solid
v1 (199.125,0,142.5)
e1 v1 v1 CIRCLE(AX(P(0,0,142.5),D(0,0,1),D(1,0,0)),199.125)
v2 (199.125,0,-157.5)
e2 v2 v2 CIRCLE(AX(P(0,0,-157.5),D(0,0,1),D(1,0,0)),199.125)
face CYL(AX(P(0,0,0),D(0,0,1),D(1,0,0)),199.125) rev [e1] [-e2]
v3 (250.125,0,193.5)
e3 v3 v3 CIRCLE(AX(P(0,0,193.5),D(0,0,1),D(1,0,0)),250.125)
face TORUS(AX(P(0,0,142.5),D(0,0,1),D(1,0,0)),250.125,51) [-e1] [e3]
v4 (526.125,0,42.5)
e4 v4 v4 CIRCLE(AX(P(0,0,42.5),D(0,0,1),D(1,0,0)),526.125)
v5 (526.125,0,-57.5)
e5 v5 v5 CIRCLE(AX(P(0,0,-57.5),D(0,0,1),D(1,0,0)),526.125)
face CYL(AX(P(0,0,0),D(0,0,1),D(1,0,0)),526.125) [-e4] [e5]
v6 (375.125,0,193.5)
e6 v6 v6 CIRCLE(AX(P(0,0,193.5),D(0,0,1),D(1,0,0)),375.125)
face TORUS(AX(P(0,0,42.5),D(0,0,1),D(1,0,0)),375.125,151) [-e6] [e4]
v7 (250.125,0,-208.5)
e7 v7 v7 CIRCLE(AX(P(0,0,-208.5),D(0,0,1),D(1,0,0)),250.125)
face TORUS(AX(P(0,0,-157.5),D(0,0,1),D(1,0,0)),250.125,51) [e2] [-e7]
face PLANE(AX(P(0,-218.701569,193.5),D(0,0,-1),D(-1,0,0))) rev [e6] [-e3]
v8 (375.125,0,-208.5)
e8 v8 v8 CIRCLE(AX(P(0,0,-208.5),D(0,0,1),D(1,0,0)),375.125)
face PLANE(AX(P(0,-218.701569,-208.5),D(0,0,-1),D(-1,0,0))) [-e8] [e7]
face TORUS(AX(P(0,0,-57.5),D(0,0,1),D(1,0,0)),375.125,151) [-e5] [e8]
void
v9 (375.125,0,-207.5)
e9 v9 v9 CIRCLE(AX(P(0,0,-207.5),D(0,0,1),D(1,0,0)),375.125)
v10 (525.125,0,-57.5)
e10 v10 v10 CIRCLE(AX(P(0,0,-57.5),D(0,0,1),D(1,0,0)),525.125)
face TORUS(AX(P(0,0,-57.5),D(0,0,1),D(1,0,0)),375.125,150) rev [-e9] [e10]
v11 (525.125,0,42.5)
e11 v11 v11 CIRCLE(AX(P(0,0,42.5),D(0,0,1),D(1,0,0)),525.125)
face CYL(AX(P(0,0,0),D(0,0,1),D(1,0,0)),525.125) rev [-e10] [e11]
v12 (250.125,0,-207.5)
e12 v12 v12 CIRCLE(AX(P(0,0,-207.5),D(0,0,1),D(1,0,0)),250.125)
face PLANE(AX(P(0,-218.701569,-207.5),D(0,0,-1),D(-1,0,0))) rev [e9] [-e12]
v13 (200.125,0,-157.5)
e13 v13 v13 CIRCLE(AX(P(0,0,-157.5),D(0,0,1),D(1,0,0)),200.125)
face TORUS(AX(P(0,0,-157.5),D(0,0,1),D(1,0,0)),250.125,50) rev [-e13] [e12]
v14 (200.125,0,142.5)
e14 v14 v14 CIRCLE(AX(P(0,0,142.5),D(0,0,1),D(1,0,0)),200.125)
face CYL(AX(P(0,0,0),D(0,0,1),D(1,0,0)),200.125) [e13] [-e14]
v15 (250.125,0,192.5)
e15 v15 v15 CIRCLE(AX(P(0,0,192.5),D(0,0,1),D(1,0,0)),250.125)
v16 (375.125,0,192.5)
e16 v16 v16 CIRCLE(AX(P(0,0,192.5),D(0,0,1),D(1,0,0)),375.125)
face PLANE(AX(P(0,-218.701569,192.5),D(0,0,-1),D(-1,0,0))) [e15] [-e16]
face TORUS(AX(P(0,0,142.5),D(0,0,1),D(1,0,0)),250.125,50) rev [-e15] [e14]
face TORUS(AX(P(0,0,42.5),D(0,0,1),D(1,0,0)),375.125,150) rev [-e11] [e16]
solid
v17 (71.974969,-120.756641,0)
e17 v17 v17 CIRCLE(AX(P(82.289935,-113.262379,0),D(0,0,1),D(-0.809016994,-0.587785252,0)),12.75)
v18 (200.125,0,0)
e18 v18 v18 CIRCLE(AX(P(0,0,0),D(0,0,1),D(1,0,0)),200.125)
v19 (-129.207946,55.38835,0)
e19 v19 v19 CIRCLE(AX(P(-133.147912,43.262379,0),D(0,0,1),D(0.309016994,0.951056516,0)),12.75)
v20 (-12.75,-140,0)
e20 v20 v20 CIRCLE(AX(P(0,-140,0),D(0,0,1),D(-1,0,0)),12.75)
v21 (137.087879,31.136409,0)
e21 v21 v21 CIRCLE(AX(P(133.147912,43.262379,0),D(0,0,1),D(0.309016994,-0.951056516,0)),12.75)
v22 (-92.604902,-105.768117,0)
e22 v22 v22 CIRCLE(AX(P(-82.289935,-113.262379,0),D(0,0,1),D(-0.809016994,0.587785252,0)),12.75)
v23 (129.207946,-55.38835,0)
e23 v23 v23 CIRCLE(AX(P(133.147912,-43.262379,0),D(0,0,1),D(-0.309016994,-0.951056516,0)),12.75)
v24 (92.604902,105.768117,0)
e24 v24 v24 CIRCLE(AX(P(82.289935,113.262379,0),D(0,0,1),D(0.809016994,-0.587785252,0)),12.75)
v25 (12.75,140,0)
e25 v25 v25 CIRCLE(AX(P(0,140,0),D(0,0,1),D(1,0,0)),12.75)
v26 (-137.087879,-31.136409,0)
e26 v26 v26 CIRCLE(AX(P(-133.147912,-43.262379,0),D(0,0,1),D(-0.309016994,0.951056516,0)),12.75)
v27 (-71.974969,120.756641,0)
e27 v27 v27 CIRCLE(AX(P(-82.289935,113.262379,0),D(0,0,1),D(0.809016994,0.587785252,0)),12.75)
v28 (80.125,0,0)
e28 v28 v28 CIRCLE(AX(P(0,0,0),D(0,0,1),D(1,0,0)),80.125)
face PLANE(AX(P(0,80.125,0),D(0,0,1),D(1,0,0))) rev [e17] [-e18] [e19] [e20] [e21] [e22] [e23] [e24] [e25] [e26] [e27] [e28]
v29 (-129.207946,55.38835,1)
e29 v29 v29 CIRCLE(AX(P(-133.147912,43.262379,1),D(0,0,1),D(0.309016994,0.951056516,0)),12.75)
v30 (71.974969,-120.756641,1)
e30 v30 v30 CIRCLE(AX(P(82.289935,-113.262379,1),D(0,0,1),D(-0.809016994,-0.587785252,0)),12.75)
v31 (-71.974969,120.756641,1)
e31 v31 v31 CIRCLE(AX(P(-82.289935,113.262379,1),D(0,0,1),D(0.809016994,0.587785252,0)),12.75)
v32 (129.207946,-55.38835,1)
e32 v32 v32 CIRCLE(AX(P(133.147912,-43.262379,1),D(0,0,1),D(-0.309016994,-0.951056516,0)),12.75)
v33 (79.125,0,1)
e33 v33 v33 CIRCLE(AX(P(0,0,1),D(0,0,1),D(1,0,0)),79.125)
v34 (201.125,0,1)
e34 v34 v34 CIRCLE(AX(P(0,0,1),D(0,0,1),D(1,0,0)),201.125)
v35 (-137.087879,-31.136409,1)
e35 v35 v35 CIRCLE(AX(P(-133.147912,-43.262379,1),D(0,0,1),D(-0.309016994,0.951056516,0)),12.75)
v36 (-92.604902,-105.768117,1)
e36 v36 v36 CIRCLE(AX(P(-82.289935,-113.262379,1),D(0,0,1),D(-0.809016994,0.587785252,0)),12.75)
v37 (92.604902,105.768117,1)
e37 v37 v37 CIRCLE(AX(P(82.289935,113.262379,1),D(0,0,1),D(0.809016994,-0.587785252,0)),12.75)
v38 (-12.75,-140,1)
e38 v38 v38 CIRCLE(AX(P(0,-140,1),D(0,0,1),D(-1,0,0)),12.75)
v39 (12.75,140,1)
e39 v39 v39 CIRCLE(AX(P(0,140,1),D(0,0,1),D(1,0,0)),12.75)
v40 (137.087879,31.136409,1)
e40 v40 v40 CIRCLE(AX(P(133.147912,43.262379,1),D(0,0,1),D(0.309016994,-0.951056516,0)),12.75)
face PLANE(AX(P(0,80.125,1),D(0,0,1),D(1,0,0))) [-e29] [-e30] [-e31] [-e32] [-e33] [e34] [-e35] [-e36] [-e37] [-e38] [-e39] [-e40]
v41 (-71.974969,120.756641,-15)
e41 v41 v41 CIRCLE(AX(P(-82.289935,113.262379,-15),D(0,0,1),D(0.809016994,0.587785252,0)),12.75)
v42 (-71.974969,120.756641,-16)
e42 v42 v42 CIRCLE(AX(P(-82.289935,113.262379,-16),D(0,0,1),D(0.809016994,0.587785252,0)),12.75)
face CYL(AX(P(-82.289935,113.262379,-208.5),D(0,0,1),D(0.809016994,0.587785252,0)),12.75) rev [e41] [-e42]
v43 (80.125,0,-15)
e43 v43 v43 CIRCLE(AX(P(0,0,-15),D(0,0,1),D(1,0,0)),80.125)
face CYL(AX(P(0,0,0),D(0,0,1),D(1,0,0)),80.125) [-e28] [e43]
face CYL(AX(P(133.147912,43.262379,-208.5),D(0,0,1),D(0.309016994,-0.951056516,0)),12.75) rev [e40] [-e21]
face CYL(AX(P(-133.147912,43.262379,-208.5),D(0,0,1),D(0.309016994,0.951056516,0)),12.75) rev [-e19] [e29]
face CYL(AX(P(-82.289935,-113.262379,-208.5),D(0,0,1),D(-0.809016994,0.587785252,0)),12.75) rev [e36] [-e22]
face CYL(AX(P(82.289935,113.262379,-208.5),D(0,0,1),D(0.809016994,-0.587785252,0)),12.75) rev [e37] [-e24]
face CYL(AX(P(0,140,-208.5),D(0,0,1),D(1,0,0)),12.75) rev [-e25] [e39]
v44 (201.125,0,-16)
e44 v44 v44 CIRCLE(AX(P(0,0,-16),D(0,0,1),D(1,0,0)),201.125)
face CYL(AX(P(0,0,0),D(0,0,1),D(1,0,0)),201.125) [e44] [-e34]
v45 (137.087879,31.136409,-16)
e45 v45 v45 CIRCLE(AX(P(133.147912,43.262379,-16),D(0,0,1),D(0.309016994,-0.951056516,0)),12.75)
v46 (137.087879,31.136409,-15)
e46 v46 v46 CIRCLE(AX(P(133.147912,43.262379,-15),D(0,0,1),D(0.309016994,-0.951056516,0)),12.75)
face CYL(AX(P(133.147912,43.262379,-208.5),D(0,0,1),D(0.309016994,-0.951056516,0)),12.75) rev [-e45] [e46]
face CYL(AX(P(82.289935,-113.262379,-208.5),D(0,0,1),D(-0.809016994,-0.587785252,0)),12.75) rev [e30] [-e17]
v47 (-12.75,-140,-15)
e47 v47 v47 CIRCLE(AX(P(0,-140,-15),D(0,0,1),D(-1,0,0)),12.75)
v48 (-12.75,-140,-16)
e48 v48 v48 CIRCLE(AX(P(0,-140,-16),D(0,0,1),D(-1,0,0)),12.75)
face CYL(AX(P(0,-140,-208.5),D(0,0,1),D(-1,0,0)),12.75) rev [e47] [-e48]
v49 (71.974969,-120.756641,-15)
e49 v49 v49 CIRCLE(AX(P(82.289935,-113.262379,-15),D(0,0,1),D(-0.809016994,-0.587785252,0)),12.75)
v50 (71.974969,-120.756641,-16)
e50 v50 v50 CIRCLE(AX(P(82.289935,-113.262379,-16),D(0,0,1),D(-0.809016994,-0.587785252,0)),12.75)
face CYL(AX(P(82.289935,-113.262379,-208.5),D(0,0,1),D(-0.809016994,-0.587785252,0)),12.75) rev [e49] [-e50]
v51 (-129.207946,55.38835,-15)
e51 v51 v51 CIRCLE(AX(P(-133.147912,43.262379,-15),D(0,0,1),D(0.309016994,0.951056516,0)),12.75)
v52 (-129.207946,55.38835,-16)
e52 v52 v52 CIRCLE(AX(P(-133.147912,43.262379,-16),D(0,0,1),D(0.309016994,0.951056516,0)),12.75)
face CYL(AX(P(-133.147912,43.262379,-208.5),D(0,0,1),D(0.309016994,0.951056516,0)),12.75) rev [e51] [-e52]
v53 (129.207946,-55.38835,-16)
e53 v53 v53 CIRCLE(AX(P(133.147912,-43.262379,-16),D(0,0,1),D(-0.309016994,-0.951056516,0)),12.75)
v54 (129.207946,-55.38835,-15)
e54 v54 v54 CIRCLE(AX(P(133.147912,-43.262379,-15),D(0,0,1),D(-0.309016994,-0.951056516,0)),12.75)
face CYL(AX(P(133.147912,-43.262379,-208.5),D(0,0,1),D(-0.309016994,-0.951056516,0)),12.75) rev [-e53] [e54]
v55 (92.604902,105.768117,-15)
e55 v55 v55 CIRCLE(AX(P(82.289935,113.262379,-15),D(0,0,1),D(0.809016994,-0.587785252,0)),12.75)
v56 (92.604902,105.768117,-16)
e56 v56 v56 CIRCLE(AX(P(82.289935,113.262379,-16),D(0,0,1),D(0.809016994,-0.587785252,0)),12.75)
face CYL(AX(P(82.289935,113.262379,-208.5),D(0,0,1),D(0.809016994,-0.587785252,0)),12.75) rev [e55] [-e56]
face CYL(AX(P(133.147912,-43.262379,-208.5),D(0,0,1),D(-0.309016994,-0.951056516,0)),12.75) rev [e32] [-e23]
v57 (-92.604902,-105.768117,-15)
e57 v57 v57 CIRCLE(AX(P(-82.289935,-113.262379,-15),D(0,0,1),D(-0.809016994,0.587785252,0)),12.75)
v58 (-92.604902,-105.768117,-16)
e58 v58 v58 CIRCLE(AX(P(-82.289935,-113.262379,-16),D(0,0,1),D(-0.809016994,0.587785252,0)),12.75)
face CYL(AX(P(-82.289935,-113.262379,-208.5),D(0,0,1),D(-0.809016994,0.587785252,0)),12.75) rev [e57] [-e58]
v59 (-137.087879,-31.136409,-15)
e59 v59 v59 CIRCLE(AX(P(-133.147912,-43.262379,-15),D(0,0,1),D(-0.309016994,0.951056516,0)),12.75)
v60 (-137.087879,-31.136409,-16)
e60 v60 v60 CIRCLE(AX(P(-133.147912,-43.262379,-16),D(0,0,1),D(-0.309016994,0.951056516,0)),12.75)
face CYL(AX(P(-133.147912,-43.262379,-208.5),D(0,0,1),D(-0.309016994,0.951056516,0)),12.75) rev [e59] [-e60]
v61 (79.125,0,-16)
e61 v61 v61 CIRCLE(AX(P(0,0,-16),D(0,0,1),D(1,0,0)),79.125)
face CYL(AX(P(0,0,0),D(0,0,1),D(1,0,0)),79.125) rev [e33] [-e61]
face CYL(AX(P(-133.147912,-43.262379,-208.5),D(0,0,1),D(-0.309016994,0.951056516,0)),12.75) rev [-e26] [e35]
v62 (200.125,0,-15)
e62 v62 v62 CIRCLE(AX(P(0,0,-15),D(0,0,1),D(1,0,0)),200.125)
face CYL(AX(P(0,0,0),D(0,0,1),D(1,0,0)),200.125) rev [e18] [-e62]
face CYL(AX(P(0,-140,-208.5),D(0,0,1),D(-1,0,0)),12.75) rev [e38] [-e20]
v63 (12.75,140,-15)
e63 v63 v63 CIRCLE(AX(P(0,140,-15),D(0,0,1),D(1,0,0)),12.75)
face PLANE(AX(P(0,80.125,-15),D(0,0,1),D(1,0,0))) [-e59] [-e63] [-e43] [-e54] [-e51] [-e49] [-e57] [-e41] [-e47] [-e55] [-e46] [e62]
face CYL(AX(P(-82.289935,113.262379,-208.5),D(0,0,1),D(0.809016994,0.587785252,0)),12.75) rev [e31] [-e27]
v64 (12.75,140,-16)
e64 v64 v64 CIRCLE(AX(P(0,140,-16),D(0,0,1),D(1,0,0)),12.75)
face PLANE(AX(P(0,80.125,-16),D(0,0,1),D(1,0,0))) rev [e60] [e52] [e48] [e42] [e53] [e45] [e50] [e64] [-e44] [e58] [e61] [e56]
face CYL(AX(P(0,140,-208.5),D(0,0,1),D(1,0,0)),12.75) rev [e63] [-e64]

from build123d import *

# Parameters (mm, degrees)
REVOLVE_THIN2_START         = -16
REVOLVE_THIN2_OUTLINE_R     = 201.125
REVOLVE_THIN2_OUTLINE_R_2   = 79.125
REVOLVE_THIN2_DEPTH         = 1
REVOLVE_THIN2_2_OUTLINE_R   = 201.125
REVOLVE_THIN2_2_OUTLINE_R_2 = 79.125
REVOLVE_THIN2_2_DEPTH       = 1
REVOLVE_THIN2_START_2       = -15
REVOLVE_THIN2_3_OUTLINE_R   = 201.125
REVOLVE_THIN2_3_OUTLINE_R_2 = 200.125
REVOLVE_THIN2_3_OUTLINE_R_3 = 80.125
REVOLVE_THIN2_3_OUTLINE_R_4 = 79.125
REVOLVE_THIN2_3_DEPTH       = 15
SKETCH2_R                   = 12.75
CUT_EXTRUDE2_DEPTH          = 773.984657863
CIRPATTERN3_COUNT           = 10


# Read off the part's stored shape, not the designer's step: Revolve-Thin2
with BuildPart() as part:
    # Revolve-Thin2 outline → Revolve-Thin2 (new body)
    with BuildSketch(Plane.XY.offset(REVOLVE_THIN2_START)):
        Circle(REVOLVE_THIN2_OUTLINE_R)
        Circle(REVOLVE_THIN2_OUTLINE_R_2, mode=Mode.SUBTRACT)
    extrude(amount=REVOLVE_THIN2_DEPTH)



with BuildPart() as body_2:
    # Revolve-Thin2 2 outline → Revolve-Thin2 2 (new body)
    with BuildSketch(Plane.XY):
        Circle(REVOLVE_THIN2_2_OUTLINE_R)
        Circle(REVOLVE_THIN2_2_OUTLINE_R_2, mode=Mode.SUBTRACT)
    extrude(amount=REVOLVE_THIN2_2_DEPTH)


with BuildPart() as part_1:
    add(part.part)

    add(body_2.part)  # Revolve-Thin2 3 merges body 2
    # Revolve-Thin2 3 outline → Revolve-Thin2 3 (add)
    # profile 1 of 2: a face of its own
    with BuildSketch(Plane.XY.offset(REVOLVE_THIN2_START_2)):
        Circle(REVOLVE_THIN2_3_OUTLINE_R)
        Circle(REVOLVE_THIN2_3_OUTLINE_R_2, mode=Mode.SUBTRACT)
    # profile 2 of 2: a face of its own
    with BuildSketch(Plane.XY.offset(REVOLVE_THIN2_START_2)):
        Circle(REVOLVE_THIN2_3_OUTLINE_R_3)
        Circle(REVOLVE_THIN2_3_OUTLINE_R_4, mode=Mode.SUBTRACT)
    extrude(amount=REVOLVE_THIN2_3_DEPTH)

    # Sketch2 → Cut-Extrude2 (cut, through all)
    with BuildSketch(Plane.XY.offset(1)):
        with Locations((0, 140)):
            Circle(SKETCH2_R)
    cut_extrude2 = extrude(amount=-CUT_EXTRUDE2_DEPTH, mode=Mode.SUBTRACT)

    # CirPattern3: Cut-Extrude2 ×10 about axis
    cirpattern3_axis = Axis((0, 0, 0), (0, 0, 1))
    for i in range(1, CIRPATTERN3_COUNT):
        add(cut_extrude2.rotate(cirpattern3_axis, i * 360 / CIRPATTERN3_COUNT), mode=Mode.SUBTRACT)


with BuildPart() as body_2_2:
    # Revolve-Thin2 4 outline → Revolve-Thin2 4 (revolve)
    with BuildSketch(Plane.XZ):
        with BuildLine():
            Line((199.125, 142.5), (199.125, -157.5))
            ThreePointArc((199.125, -157.5), (214.062554159, -193.562445841), (250.125, -208.5))
            Line((250.125, -208.5), (375.125, -208.5))
            ThreePointArc((375.125, -208.5), (481.898123959, -164.273123959), (526.125, -57.5))
            Line((526.125, -57.5), (526.125, 42.5))
            ThreePointArc((526.125, 42.5), (481.898123959, 149.273123959), (375.125, 193.5))
            Line((375.125, 193.5), (250.125, 193.5))
            ThreePointArc((250.125, 193.5), (214.062554159, 178.562445841), (199.125, 142.5))
        make_face()
        with BuildLine():
            Line((200.125, -157.5), (200.125, 142.5))
            ThreePointArc((200.125, 142.5), (214.769660941, 177.855339059), (250.125, 192.5))
            Line((250.125, 192.5), (375.125, 192.5))
            ThreePointArc((375.125, 192.5), (481.191017178, 148.566017178), (525.125, 42.5))
            Line((525.125, 42.5), (525.125, -57.5))
            ThreePointArc((525.125, -57.5), (481.191017178, -163.566017178), (375.125, -207.5))
            Line((375.125, -207.5), (250.125, -207.5))
            ThreePointArc((250.125, -207.5), (214.769660941, -192.855339059), (200.125, -157.5))
        make_face(mode=Mode.SUBTRACT)
    revolve(axis=Axis((0, 0, 0), (0, 0, 1)))


solid = Compound([part_1.part, body_2_2.part])
